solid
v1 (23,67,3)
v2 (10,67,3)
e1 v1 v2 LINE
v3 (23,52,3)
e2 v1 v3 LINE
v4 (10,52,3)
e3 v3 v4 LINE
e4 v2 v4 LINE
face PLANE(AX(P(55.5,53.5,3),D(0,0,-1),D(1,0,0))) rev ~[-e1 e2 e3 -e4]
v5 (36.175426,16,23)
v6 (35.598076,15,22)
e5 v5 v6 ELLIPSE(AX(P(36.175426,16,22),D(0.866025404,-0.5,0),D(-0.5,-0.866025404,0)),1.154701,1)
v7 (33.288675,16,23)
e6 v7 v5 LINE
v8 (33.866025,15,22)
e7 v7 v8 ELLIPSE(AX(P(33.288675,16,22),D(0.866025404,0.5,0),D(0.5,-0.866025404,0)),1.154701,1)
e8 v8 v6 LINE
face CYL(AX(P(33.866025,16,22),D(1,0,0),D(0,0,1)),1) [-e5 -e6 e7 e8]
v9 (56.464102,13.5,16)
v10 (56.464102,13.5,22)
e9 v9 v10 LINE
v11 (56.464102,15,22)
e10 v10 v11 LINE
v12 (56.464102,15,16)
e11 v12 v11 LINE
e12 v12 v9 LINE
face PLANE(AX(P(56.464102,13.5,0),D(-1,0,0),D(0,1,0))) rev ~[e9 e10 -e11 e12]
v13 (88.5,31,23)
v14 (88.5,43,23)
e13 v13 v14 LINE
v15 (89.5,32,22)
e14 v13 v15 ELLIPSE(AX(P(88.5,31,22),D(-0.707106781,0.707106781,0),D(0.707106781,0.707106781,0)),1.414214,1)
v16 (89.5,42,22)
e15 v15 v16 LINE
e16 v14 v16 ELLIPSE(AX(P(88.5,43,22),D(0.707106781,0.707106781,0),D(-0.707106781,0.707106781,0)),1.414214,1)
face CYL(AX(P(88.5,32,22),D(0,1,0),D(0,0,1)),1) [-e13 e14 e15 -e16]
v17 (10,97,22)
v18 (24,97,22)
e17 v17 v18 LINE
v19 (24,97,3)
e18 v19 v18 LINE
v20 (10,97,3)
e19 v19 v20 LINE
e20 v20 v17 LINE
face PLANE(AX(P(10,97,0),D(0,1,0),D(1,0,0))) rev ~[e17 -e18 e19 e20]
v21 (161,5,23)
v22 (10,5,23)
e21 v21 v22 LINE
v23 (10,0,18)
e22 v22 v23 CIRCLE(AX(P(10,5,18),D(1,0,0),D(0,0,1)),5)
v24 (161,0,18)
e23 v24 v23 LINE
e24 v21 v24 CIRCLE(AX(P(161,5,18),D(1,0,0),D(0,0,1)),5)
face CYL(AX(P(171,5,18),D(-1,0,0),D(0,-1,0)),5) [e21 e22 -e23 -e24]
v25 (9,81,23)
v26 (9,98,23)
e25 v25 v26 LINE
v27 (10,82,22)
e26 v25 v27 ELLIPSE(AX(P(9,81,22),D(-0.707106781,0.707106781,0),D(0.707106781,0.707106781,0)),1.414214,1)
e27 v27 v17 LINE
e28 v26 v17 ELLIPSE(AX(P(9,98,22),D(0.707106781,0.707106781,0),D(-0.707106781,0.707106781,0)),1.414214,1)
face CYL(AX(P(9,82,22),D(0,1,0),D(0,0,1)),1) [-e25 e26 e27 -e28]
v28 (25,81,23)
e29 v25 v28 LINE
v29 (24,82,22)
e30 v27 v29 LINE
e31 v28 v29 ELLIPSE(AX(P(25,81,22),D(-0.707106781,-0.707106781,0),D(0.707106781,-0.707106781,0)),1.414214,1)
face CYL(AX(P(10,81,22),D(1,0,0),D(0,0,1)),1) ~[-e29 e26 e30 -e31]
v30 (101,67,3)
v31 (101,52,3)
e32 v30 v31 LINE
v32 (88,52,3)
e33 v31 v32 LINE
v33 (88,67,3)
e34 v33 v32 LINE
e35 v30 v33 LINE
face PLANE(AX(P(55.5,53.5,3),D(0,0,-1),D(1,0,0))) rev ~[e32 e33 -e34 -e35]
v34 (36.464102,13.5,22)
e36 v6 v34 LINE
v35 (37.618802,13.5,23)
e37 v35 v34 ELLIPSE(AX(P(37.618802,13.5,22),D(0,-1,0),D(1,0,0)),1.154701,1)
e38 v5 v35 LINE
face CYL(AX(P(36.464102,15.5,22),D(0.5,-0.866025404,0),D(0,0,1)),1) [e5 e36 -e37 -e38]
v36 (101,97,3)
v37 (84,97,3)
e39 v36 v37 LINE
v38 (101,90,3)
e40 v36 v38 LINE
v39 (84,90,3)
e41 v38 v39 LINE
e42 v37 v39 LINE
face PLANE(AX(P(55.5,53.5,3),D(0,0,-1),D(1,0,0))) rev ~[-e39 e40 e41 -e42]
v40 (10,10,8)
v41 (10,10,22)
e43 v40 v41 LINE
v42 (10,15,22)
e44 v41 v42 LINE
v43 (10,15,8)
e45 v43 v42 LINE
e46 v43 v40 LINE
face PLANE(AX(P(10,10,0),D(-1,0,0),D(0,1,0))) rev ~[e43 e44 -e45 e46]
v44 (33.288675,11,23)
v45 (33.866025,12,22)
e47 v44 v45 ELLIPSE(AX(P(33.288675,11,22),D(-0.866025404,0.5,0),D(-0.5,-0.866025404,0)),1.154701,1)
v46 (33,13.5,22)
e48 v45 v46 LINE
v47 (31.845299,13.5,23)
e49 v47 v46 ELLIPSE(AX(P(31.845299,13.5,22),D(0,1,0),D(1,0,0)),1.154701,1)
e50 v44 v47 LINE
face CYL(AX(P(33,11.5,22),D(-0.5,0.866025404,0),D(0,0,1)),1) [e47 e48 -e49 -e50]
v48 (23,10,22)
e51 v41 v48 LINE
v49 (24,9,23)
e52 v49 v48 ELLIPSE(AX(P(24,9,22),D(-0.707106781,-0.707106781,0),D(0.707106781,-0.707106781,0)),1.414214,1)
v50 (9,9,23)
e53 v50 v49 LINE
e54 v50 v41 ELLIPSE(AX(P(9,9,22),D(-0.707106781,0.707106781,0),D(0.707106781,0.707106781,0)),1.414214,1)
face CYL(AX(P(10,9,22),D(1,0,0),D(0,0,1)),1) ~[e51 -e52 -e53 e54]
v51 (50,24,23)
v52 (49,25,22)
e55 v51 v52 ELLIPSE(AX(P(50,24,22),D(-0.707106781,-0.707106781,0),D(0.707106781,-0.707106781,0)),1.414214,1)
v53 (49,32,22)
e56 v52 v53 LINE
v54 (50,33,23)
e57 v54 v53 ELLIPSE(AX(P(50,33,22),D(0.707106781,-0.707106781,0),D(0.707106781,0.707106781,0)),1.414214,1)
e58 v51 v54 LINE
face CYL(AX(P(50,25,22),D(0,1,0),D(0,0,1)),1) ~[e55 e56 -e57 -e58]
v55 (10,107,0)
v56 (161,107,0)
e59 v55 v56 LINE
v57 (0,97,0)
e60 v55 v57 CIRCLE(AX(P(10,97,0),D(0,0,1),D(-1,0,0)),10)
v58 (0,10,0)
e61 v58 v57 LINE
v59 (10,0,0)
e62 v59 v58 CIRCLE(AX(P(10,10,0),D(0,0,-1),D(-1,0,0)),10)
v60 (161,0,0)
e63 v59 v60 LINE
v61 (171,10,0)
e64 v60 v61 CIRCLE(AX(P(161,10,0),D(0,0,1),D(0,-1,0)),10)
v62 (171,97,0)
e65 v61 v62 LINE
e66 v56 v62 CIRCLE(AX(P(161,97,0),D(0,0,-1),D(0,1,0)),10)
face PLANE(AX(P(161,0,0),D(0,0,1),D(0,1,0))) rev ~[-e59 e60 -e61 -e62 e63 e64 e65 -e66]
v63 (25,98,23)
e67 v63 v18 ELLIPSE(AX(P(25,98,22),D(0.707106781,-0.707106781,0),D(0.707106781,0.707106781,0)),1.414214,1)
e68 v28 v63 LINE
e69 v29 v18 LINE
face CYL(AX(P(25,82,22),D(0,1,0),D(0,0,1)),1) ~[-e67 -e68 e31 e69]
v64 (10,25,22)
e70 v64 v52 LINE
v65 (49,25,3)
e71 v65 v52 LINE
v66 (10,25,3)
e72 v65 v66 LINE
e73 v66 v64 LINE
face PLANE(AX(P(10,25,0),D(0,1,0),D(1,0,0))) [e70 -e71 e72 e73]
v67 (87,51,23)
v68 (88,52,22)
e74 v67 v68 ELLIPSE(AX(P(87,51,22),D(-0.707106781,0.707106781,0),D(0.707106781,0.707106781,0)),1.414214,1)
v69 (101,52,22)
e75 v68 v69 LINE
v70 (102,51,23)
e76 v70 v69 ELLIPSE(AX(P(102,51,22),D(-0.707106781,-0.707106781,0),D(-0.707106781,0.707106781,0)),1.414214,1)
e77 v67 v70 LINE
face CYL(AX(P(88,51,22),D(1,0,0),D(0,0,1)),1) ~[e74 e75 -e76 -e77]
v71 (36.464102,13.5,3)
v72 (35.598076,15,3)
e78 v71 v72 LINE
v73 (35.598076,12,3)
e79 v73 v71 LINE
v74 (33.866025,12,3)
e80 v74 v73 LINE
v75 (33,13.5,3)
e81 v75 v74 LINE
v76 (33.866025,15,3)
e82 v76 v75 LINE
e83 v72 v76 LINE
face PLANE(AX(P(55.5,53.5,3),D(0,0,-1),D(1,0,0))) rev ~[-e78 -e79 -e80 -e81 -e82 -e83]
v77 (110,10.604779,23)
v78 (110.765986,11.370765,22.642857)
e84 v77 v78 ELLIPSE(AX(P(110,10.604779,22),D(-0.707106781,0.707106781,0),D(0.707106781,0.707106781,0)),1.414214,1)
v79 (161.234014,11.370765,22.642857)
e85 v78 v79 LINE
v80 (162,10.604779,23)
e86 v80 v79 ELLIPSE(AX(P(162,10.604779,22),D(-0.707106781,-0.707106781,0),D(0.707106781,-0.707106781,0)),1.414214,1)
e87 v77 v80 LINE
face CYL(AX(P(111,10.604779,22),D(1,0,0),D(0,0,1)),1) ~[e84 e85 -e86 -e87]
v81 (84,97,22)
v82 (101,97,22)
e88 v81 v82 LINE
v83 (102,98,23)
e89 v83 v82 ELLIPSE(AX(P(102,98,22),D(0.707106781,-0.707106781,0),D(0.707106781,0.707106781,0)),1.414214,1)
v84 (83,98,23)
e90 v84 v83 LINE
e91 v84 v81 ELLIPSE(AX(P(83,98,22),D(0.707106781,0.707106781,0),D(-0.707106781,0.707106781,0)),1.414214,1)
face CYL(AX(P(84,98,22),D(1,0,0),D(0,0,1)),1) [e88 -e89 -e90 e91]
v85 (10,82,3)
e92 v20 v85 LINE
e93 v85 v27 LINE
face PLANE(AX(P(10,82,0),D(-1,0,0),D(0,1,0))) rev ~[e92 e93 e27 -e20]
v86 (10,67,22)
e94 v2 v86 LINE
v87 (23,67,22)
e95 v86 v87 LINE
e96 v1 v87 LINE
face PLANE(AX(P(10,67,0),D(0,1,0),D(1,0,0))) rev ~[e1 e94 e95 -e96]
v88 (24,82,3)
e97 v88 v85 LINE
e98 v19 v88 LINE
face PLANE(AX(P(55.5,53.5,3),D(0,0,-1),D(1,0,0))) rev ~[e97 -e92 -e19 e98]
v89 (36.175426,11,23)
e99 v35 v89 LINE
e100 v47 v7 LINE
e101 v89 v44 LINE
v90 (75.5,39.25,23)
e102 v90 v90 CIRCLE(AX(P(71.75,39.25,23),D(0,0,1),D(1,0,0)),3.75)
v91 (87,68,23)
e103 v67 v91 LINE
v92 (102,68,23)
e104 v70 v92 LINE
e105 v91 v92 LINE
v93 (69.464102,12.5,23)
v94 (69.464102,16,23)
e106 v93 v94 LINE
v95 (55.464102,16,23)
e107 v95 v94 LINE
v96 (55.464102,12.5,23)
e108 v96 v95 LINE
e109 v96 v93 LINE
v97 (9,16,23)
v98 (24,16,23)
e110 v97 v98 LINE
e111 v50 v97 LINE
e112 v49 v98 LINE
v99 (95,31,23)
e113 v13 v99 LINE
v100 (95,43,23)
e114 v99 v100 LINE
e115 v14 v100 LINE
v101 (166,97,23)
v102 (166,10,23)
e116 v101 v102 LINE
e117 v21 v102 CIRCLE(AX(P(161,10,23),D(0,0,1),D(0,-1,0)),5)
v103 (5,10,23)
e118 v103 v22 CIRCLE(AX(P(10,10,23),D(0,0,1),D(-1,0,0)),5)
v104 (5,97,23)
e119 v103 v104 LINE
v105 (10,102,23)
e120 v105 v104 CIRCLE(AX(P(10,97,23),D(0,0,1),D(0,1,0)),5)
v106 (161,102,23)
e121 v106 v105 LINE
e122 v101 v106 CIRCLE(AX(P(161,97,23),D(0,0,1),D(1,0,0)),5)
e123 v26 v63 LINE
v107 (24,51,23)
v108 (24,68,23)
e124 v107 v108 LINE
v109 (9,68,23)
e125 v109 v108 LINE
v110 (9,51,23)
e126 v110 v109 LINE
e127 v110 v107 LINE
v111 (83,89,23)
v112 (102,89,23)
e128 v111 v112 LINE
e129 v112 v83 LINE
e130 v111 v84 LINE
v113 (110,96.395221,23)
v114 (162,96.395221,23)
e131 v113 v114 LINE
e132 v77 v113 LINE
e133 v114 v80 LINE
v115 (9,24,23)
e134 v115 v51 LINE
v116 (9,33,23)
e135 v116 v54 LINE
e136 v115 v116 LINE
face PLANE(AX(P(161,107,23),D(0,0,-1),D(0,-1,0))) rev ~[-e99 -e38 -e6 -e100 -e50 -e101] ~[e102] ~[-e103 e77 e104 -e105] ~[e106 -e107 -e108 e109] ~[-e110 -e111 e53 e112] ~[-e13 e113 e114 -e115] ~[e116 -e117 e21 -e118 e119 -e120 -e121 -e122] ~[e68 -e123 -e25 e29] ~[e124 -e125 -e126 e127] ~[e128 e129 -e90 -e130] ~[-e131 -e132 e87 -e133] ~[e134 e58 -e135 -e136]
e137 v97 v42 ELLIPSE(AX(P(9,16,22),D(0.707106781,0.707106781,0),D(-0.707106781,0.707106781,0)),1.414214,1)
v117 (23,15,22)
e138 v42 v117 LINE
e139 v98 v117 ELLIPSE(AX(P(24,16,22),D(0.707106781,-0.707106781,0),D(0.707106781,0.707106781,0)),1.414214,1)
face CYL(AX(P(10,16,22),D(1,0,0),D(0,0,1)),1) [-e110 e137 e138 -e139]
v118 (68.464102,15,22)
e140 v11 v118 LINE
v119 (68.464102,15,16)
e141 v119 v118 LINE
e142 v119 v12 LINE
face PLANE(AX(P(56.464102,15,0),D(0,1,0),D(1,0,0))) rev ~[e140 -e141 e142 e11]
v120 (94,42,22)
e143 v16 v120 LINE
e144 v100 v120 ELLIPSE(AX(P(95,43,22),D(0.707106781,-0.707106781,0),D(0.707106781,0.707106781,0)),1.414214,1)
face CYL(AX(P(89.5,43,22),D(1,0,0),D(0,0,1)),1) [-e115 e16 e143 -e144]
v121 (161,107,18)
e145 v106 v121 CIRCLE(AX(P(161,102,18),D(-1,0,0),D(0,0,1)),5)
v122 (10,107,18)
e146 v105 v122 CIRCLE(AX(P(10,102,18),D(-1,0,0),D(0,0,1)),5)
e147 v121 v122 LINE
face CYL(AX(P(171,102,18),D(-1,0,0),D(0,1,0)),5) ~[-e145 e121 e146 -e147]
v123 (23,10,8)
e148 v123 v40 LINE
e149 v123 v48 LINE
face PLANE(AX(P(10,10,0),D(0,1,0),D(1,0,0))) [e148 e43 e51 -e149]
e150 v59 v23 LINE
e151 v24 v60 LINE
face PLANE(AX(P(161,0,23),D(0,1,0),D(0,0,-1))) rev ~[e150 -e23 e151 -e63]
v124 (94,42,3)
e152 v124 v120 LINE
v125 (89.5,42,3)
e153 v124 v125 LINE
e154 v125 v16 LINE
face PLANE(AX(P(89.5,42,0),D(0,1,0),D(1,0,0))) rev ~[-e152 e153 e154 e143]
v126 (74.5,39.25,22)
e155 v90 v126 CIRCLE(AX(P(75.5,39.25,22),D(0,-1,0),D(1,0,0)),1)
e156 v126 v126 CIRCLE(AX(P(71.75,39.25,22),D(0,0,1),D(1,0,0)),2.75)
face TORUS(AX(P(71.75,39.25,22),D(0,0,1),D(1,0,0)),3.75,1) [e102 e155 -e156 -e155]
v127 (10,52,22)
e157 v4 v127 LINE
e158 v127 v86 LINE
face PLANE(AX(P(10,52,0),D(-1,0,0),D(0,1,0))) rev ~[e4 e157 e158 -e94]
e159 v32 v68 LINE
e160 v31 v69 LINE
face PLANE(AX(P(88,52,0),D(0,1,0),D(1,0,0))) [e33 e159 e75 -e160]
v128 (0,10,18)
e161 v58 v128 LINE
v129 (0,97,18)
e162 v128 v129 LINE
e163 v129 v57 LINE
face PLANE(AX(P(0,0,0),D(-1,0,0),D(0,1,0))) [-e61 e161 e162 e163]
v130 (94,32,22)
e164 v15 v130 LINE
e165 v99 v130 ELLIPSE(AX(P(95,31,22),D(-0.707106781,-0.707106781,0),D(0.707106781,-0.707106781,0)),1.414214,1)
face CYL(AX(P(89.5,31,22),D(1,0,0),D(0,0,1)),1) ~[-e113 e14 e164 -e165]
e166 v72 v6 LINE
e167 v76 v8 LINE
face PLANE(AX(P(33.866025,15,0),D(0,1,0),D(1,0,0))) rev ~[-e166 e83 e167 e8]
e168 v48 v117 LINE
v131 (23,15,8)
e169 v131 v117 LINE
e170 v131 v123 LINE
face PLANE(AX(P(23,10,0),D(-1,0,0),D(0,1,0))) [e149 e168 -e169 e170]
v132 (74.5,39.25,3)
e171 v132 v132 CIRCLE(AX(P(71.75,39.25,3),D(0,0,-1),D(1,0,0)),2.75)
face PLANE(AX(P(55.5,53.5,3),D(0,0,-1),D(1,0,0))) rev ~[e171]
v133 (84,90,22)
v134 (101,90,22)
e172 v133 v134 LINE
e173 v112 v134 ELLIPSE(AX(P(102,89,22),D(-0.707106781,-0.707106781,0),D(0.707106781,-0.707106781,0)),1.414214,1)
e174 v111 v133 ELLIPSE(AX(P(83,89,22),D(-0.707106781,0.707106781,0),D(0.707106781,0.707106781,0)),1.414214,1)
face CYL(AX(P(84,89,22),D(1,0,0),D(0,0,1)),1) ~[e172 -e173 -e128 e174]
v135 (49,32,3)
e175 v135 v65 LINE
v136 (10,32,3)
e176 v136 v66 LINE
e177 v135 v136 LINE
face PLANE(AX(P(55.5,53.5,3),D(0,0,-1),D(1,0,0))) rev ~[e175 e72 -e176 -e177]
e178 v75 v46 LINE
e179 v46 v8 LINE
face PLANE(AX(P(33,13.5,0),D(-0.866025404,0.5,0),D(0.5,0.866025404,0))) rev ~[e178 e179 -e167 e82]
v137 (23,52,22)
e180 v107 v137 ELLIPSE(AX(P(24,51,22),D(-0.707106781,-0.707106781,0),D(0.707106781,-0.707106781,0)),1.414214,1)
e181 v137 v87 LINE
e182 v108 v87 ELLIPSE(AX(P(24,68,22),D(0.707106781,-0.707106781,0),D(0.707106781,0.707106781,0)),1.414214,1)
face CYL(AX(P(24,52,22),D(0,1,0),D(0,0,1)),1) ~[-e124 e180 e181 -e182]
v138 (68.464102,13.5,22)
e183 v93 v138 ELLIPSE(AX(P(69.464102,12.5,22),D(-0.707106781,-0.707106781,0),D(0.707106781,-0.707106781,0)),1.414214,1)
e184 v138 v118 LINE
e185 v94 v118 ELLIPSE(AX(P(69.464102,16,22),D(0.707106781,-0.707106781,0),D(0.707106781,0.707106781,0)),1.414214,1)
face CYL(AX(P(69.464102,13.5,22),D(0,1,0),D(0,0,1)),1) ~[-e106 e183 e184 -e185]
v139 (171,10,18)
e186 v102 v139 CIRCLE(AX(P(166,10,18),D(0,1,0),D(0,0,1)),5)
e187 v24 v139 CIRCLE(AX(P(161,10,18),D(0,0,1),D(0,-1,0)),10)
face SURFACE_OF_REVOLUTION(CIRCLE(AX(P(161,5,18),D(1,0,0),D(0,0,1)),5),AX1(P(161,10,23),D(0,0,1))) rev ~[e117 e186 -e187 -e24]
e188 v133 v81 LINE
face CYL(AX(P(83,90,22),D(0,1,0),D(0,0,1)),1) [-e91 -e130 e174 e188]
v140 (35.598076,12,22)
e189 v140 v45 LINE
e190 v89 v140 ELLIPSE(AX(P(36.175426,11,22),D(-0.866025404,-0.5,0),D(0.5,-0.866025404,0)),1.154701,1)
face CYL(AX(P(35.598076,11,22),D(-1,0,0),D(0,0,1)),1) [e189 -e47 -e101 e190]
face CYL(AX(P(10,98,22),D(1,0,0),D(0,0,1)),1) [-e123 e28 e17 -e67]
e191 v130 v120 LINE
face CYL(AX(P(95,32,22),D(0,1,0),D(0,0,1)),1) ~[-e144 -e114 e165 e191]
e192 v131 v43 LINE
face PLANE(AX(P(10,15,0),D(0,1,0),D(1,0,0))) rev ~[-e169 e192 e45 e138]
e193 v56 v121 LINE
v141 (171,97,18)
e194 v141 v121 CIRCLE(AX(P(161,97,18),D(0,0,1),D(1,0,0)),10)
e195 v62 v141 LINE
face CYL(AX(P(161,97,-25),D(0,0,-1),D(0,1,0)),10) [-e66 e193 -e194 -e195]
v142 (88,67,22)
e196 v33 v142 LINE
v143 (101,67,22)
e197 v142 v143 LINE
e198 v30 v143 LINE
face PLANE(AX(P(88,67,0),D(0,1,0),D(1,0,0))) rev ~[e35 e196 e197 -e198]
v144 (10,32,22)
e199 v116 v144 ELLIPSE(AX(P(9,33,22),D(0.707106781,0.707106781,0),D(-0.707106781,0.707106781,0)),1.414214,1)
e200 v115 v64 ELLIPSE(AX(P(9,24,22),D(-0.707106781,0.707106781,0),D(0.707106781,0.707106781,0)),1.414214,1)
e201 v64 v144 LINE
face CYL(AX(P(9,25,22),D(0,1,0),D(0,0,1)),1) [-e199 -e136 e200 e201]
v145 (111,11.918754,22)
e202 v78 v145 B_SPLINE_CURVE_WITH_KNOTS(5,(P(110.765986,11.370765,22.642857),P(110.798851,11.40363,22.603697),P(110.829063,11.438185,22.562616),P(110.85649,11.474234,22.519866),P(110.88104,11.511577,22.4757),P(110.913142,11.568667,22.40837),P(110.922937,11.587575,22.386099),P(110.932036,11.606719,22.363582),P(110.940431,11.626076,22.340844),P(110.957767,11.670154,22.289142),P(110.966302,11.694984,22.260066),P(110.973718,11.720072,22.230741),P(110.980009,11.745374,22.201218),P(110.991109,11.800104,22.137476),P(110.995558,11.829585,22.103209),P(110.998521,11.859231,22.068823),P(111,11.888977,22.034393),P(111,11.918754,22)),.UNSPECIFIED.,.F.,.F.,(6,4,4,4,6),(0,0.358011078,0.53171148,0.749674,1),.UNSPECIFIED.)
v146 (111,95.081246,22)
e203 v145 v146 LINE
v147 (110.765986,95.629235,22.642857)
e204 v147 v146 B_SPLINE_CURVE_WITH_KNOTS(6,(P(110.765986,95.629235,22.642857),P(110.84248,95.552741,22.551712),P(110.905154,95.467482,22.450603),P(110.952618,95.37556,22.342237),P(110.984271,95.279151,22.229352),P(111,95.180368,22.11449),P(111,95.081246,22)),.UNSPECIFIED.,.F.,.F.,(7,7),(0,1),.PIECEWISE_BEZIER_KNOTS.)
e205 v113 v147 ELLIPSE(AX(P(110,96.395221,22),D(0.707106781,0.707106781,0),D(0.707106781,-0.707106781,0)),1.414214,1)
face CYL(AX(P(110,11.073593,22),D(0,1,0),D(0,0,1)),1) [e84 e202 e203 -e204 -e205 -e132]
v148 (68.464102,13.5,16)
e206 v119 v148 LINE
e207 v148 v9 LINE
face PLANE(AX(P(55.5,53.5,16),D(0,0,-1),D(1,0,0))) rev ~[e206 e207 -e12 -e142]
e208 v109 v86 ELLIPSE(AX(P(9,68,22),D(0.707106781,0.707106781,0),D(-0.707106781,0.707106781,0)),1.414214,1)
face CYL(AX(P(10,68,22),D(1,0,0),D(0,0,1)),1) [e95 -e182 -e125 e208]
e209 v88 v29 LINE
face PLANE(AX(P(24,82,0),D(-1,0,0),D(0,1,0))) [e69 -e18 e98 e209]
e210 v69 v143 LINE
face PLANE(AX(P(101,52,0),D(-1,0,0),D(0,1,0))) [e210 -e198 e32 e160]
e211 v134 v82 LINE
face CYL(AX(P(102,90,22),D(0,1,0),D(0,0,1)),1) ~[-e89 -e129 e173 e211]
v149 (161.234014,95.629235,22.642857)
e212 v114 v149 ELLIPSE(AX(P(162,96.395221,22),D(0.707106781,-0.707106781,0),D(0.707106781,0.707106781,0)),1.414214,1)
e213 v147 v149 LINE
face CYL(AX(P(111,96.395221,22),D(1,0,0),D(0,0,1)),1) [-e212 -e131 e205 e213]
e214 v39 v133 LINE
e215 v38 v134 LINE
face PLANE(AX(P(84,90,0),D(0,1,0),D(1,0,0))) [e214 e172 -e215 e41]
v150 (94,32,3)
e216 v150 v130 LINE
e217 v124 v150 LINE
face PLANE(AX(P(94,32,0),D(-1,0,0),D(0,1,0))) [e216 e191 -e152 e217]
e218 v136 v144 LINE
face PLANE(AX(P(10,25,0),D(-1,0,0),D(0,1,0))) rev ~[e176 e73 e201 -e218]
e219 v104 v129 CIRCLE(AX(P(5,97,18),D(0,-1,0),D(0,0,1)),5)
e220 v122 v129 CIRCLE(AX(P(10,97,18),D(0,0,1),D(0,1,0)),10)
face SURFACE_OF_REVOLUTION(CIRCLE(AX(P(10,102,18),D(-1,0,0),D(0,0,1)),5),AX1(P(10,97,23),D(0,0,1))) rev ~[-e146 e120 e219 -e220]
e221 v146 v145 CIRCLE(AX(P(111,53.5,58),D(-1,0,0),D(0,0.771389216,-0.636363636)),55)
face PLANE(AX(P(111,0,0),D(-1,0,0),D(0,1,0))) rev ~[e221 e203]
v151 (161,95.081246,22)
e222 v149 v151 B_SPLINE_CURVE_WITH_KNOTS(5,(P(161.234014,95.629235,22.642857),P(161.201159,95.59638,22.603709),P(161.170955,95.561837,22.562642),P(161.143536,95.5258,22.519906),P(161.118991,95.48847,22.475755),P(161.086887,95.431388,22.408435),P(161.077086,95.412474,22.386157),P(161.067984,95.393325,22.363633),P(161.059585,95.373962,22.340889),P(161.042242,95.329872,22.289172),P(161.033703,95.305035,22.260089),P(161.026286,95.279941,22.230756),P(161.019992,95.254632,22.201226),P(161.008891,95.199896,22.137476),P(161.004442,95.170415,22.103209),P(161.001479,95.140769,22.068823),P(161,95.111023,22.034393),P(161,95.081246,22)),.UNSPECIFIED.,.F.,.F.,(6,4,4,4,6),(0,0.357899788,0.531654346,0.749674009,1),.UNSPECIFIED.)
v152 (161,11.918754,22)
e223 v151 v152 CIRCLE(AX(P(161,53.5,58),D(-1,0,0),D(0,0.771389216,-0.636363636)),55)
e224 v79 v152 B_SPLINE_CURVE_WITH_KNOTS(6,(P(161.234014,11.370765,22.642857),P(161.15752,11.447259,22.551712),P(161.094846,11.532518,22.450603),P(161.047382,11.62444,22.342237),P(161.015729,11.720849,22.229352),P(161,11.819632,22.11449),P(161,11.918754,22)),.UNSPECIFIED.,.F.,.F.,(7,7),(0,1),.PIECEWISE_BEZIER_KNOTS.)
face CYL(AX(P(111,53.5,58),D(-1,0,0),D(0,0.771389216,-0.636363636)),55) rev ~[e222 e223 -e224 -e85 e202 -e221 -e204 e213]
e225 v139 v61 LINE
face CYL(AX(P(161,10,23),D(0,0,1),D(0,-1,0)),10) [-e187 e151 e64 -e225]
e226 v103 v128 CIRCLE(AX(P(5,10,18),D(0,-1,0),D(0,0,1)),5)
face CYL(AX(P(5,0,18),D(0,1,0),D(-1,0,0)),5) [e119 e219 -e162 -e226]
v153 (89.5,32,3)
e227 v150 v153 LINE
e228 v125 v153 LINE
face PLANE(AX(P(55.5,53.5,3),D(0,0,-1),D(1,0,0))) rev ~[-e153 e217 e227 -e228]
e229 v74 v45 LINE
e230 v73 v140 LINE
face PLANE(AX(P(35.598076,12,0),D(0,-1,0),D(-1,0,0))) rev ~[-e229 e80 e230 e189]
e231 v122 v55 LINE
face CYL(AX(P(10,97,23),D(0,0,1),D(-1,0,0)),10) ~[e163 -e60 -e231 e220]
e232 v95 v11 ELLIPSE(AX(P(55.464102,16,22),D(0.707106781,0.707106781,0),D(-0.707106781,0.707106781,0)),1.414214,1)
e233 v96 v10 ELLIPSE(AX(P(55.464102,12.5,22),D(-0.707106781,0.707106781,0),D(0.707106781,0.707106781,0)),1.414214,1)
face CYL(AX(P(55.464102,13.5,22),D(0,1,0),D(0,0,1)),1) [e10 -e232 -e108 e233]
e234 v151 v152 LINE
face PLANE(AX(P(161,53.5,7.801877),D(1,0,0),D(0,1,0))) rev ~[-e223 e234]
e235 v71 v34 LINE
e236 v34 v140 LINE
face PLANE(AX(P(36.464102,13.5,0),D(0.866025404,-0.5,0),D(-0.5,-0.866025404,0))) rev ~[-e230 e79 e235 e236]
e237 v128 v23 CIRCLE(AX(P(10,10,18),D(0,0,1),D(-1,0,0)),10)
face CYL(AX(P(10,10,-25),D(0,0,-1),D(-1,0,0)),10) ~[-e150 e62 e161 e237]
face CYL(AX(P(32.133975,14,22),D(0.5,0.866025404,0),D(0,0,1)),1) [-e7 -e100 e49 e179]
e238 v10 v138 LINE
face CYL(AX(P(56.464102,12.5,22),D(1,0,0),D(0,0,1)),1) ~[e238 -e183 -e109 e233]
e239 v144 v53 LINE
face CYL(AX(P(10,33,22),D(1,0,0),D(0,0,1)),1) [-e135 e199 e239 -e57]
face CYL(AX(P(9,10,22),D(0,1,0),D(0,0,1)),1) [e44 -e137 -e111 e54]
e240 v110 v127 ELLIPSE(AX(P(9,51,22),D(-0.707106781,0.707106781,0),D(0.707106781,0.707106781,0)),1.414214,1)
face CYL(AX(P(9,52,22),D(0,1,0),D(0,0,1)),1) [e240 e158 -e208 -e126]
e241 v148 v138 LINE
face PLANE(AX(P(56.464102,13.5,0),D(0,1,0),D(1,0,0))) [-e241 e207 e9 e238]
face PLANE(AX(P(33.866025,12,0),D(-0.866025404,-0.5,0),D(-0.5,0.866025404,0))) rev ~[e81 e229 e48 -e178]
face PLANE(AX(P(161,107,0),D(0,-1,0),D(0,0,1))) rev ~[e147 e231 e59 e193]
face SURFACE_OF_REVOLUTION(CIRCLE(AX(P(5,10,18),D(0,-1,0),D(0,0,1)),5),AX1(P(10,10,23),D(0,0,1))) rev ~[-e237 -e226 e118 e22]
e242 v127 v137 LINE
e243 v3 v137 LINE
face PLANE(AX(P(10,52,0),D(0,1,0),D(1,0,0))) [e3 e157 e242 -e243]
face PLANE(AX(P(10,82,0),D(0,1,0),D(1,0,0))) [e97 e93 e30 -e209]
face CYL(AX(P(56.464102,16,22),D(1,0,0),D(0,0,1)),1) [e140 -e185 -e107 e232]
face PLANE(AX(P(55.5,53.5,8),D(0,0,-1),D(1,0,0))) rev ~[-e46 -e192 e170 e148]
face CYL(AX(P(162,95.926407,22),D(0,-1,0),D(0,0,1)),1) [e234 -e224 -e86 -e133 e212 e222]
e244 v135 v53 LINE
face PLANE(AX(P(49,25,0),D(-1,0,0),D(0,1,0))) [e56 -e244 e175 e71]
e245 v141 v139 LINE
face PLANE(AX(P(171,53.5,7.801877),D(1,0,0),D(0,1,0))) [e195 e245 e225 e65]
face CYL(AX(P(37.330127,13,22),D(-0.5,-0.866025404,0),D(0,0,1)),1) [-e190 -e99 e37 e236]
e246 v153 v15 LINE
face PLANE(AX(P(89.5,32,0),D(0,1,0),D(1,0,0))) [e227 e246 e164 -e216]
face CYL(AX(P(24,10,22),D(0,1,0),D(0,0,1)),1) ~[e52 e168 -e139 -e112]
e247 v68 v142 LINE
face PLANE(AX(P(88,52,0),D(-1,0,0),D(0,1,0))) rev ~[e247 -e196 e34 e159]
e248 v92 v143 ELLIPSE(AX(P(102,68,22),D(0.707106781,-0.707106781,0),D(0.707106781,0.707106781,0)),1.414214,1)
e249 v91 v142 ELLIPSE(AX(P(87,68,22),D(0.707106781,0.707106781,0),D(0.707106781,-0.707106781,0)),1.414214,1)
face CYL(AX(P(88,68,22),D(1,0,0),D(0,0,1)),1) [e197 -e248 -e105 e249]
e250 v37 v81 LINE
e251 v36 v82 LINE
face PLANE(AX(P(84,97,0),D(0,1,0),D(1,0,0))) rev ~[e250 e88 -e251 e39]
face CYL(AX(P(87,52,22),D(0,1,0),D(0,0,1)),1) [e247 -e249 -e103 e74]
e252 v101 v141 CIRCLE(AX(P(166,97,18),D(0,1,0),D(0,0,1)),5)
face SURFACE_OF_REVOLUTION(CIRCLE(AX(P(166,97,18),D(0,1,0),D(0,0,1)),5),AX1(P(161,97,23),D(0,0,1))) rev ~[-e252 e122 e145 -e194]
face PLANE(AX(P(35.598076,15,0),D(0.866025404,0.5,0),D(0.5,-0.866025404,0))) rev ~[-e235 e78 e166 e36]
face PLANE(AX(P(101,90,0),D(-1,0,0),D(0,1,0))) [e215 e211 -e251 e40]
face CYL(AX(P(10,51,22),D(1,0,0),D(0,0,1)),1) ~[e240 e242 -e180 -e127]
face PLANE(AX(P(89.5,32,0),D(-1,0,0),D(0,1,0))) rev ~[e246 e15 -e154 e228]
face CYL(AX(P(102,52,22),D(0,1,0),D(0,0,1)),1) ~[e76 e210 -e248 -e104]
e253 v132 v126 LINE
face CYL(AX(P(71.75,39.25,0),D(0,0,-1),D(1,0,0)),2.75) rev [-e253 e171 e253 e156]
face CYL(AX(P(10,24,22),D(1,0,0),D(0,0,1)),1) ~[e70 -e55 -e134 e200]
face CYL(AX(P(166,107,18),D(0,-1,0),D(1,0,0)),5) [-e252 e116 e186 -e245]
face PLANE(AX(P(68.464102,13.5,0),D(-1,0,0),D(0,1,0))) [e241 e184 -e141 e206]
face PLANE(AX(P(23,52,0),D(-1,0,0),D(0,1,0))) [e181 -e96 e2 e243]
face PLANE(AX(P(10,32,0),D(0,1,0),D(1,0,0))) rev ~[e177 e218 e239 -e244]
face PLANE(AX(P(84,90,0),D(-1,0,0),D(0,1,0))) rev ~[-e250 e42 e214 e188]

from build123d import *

# Parameters (mm, degrees)
F0_W          = 111
F0_H          = 107
F0_W_2        = 13
F0_H_2        = 5
F0_W_3        = 39
F0_H_3        = 7
F0_W_4        = 12
F0_H_4        = 1.5
F0_R          = 2.75
F0_W_5        = 4.5
F0_H_5        = 10
F0_H_6        = 15
F0_W_6        = 14
F0_W_7        = 17
F1_DEPTH      = 23
F2_W          = 111
F2_H          = 107
F3_DEPTH      = 3
F4_DEPTH      = 5
F5_DEPTH      = 13
F7_DEPTH      = 50
F9_DEPTH      = 10
F10_R         = 5
F11_T3_ANGLE  = 90
F11_T6_ANGLE  = 90
F11_T9_ANGLE  = 90
F11_T12_ANGLE = 90
F11_T15_DEPTH = 48
F11_T18_DEPTH = 48
F11_T21_DEPTH = 48
F11_T24_DEPTH = 48
F12_R         = 1


# Not quite as in the source:
# - a fillet or chamfer that OpenCascade refuses, or shapes differently, is made with other operations: its cross-section is extruded or revolved along the edge and cut away or added


with BuildPart() as f1:
    # F0 (on Top) → F1 (new body)
    with BuildSketch(Plane.XY):
        with Locations((55.5, 53.5)):
            Rectangle(F0_W, F0_H)
        with Locations((16.5, 12.5)):
            Rectangle(F0_W_2, F0_H_2, mode=Mode.SUBTRACT)
        Polygon((35.5980762114, 15), (36.4641016151, 13.5), (35.5980762114, 12), (33.8660254038, 12), (33, 13.5), (33.8660254038, 15), align=None, mode=Mode.SUBTRACT)
        with Locations((29.5, 28.5)):
            Rectangle(F0_W_3, F0_H_3, mode=Mode.SUBTRACT)
        with Locations((62.4641016151, 14.25)):
            Rectangle(F0_W_4, F0_H_4, mode=Mode.SUBTRACT)
        with Locations((71.75, 39.25)):
            Circle(F0_R, mode=Mode.SUBTRACT)
        with Locations((91.75, 37)):
            Rectangle(F0_W_5, F0_H_5, mode=Mode.SUBTRACT)
        with Locations((16.5, 59.5)):
            Rectangle(F0_W_2, F0_H_6, mode=Mode.SUBTRACT)
        with Locations((17, 89.5)):
            Rectangle(F0_W_6, F0_H_6, mode=Mode.SUBTRACT)
        with Locations((94.5, 59.5)):
            Rectangle(F0_W_2, F0_H_6, mode=Mode.SUBTRACT)
        with Locations((92.5, 93.5)):
            Rectangle(F0_W_7, F0_H_3, mode=Mode.SUBTRACT)
    extrude(amount=F1_DEPTH)

    # F2 (on face) → F3 (join)
    with BuildSketch(Plane(origin=(0, 0, 0), x_dir=(1, 0, 0), z_dir=(0, 0, -1))):
        with Locations((55.5, -53.5)):
            Rectangle(F2_W, F2_H)
    extrude(amount=-F3_DEPTH)

    # F4 (add): a face of the model
    f4_faces = [f1.faces().sort_by_distance(p)[0] for p in [
        (16.5, 12.5, 3),
    ]]
    extrude(f4_faces, amount=F4_DEPTH)

    # F5 (add): a face of the model
    f5_faces = [f1.faces().sort_by_distance(p)[0] for p in [
        (62.4641016151, 14.25, 3),
    ]]
    extrude(f5_faces, amount=F5_DEPTH)

    # F6 (on face) → F7 (join)
    with BuildSketch(Plane.YZ.offset(111)):
        with BuildLine():
            Line((11.0735931288, 23), (0, 23))
            Line((0, 23), (0, 0))
            Line((0, 0), (107, 0))
            Line((107, 0), (107, 23))
            Line((107, 23), (95.9264068712, 23))
            ThreePointArc((95.9264068712, 23), (53.5, 3), (11.0735931288, 23))
        make_face()
    extrude(amount=F7_DEPTH)

    # F8 (on face) → F9 (join)
    with BuildSketch(Plane.YZ.offset(161)):
        with BuildLine():
            Line((0, 23), (0, 0))
            Line((0, 0), (107, 0))
            Line((107, 0), (107, 23))
            Line((107, 23), (95.9264068712, 23))
            ThreePointArc((95.9264068712, 23), (53.5, 3), (11.0735931288, 23))
            Line((11.0735931288, 23), (0, 23))
        make_face()
        with BuildLine():
            Line((95.9264068712, 23), (11.0735931288, 23))
            ThreePointArc((11.0735931288, 23), (53.5, 3), (95.9264068712, 23))
        make_face()
    extrude(amount=F9_DEPTH)

    # F10
    f10_edges = [f1.edges().sort_by_distance(p)[0] for p in [
        (85.5, 107, 23),
        (171, 53.5, 23),
        (85.5, 0, 23),
        (0, 53.5, 23),
    ]]
    fillet(f10_edges, radius=F10_R)

    # F11: fillet of radius 10 on 4 edges, made by hand


with BuildPart() as f11_tool1:
    # F11_s2 → F11_t3 (revolve)
    with BuildSketch(Plane.YZ.offset(10)):
        with BuildLine():
            ThreePointArc((102, 23), (105.5355339059, 21.5355339059), (107, 18))
            Line((107, 18), (107, 23))
            Line((107, 23), (102, 23))
        make_face()
    revolve(axis=Axis((10, 97, 23), (0, 0, 1)), revolution_arc=F11_T3_ANGLE)


with BuildPart() as f11_tool4:
    # F11_s5 → F11_t6 (revolve)
    with BuildSketch(Plane.XZ.offset(-10)):
        with BuildLine():
            ThreePointArc((5, 23), (1.4644660941, 21.5355339059), (0, 18))
            Line((0, 18), (0, 23))
            Line((0, 23), (5, 23))
        make_face()
    revolve(axis=Axis((10, 10, 23), (0, 0, 1)), revolution_arc=F11_T6_ANGLE)


with BuildPart() as f11_tool7:
    # F11_s8 → F11_t9 (revolve)
    with BuildSketch(Plane.YZ.offset(161)):
        with BuildLine():
            ThreePointArc((5, 23), (1.4644660941, 21.5355339059), (0, 18))
            Line((0, 18), (0, 23))
            Line((0, 23), (5, 23))
        make_face()
    revolve(axis=Axis((161, 10, 23), (0, 0, 1)), revolution_arc=F11_T9_ANGLE)


with BuildPart() as f11_tool10:
    # F11_s11 → F11_t12 (revolve)
    with BuildSketch(Plane.XZ.offset(-97)):
        with BuildLine():
            ThreePointArc((166, 23), (169.5355339059, 21.5355339059), (171, 18))
            Line((171, 18), (171, 23))
            Line((171, 23), (166, 23))
        make_face()
    revolve(axis=Axis((161, 97, 23), (0, 0, 1)), revolution_arc=F11_T12_ANGLE)


with BuildPart() as f11_tool13:
    # F11_s14 → F11_t15 (new body)
    with BuildSketch(Plane.XY.offset(-25)):
        with BuildLine():
            ThreePointArc((161, 107), (168.0710678119, 104.0710678119), (171, 97))
            Line((171, 97), (171, 107))
            Line((171, 107), (161, 107))
        make_face()
    extrude(amount=F11_T15_DEPTH)


with BuildPart() as f11_tool16:
    # F11_s17 → F11_t18 (new body)
    with BuildSketch(Plane.XY.offset(23)):
        with BuildLine():
            ThreePointArc((161, 0), (168.0710678119, 2.9289321881), (171, 10))
            Line((171, 10), (171, 0))
            Line((171, 0), (161, 0))
        make_face()
    extrude(amount=-F11_T18_DEPTH)


with BuildPart() as f11_tool19:
    # F11_s20 → F11_t21 (new body)
    with BuildSketch(Plane.XY.offset(-25)):
        with BuildLine():
            ThreePointArc((0, 10), (2.9289321881, 2.9289321881), (10, 0))
            Line((10, 0), (0, 0))
            Line((0, 0), (0, 10))
        make_face()
    extrude(amount=F11_T21_DEPTH)


with BuildPart() as f11_tool22:
    # F11_s23 → F11_t24 (new body)
    with BuildSketch(Plane.XY.offset(23)):
        with BuildLine():
            ThreePointArc((0, 97), (2.9289321881, 104.0710678119), (10, 107))
            Line((10, 107), (0, 107))
            Line((0, 107), (0, 97))
        make_face()
    extrude(amount=-F11_T24_DEPTH)


with BuildPart() as f1_1:
    add(f1.part)

    # F11_t25: cut F11_tool1, F11_tool4, F11_tool7, F11_tool10, F11_tool13, F11_tool16, F11_tool19, F11_tool22
    add([f11_tool1.part, f11_tool4.part, f11_tool7.part, f11_tool10.part, f11_tool13.part, f11_tool16.part, f11_tool19.part, f11_tool22.part], mode=Mode.SUBTRACT)

    # F12
    f12_edges = [f1_1.edges().sort_by_distance(p)[0] for p in [
        (85.5, 102, 23),
        (164.535534, 100.535534, 23),
        (166, 53.5, 23),
        (164.535534, 6.464466, 23),
        (85.5, 5, 23),
        (6.464466, 6.464466, 23),
        (5, 53.5, 23),
        (6.464466, 100.535534, 23),
        (10, 12.5, 23),
        (16.5, 10, 23),
        (16.5, 15, 23),
        (23, 12.5, 23),
        (36.031089, 14.25, 23),
        (34.732051, 15, 23),
        (36.031089, 12.75, 23),
        (33.433013, 14.25, 23),
        (34.732051, 12, 23),
        (33.433013, 12.75, 23),
        (10, 28.5, 23),
        (29.5, 25, 23),
        (29.5, 32, 23),
        (49, 28.5, 23),
        (56.464102, 14.25, 23),
        (62.464102, 13.5, 23),
        (62.464102, 15, 23),
        (68.464102, 14.25, 23),
        (69, 39.25, 23),
        (89.5, 37, 23),
        (91.75, 32, 23),
        (91.75, 42, 23),
        (94, 37, 23),
        (136, 11.073593, 23),
        (111, 53.5, 23),
        (161, 53.5, 23),
        (136, 95.926407, 23),
        (10, 59.5, 23),
        (16.5, 52, 23),
        (16.5, 67, 23),
        (23, 59.5, 23),
        (17, 82, 23),
        (24, 89.5, 23),
        (10, 89.5, 23),
        (17, 97, 23),
        (94.5, 67, 23),
        (88, 59.5, 23),
        (101, 59.5, 23),
        (94.5, 52, 23),
        (92.5, 90, 23),
        (101, 93.5, 23),
        (84, 93.5, 23),
        (92.5, 97, 23),
    ]]
    fillet(f12_edges, radius=F12_R)


solid = f1_1.part
